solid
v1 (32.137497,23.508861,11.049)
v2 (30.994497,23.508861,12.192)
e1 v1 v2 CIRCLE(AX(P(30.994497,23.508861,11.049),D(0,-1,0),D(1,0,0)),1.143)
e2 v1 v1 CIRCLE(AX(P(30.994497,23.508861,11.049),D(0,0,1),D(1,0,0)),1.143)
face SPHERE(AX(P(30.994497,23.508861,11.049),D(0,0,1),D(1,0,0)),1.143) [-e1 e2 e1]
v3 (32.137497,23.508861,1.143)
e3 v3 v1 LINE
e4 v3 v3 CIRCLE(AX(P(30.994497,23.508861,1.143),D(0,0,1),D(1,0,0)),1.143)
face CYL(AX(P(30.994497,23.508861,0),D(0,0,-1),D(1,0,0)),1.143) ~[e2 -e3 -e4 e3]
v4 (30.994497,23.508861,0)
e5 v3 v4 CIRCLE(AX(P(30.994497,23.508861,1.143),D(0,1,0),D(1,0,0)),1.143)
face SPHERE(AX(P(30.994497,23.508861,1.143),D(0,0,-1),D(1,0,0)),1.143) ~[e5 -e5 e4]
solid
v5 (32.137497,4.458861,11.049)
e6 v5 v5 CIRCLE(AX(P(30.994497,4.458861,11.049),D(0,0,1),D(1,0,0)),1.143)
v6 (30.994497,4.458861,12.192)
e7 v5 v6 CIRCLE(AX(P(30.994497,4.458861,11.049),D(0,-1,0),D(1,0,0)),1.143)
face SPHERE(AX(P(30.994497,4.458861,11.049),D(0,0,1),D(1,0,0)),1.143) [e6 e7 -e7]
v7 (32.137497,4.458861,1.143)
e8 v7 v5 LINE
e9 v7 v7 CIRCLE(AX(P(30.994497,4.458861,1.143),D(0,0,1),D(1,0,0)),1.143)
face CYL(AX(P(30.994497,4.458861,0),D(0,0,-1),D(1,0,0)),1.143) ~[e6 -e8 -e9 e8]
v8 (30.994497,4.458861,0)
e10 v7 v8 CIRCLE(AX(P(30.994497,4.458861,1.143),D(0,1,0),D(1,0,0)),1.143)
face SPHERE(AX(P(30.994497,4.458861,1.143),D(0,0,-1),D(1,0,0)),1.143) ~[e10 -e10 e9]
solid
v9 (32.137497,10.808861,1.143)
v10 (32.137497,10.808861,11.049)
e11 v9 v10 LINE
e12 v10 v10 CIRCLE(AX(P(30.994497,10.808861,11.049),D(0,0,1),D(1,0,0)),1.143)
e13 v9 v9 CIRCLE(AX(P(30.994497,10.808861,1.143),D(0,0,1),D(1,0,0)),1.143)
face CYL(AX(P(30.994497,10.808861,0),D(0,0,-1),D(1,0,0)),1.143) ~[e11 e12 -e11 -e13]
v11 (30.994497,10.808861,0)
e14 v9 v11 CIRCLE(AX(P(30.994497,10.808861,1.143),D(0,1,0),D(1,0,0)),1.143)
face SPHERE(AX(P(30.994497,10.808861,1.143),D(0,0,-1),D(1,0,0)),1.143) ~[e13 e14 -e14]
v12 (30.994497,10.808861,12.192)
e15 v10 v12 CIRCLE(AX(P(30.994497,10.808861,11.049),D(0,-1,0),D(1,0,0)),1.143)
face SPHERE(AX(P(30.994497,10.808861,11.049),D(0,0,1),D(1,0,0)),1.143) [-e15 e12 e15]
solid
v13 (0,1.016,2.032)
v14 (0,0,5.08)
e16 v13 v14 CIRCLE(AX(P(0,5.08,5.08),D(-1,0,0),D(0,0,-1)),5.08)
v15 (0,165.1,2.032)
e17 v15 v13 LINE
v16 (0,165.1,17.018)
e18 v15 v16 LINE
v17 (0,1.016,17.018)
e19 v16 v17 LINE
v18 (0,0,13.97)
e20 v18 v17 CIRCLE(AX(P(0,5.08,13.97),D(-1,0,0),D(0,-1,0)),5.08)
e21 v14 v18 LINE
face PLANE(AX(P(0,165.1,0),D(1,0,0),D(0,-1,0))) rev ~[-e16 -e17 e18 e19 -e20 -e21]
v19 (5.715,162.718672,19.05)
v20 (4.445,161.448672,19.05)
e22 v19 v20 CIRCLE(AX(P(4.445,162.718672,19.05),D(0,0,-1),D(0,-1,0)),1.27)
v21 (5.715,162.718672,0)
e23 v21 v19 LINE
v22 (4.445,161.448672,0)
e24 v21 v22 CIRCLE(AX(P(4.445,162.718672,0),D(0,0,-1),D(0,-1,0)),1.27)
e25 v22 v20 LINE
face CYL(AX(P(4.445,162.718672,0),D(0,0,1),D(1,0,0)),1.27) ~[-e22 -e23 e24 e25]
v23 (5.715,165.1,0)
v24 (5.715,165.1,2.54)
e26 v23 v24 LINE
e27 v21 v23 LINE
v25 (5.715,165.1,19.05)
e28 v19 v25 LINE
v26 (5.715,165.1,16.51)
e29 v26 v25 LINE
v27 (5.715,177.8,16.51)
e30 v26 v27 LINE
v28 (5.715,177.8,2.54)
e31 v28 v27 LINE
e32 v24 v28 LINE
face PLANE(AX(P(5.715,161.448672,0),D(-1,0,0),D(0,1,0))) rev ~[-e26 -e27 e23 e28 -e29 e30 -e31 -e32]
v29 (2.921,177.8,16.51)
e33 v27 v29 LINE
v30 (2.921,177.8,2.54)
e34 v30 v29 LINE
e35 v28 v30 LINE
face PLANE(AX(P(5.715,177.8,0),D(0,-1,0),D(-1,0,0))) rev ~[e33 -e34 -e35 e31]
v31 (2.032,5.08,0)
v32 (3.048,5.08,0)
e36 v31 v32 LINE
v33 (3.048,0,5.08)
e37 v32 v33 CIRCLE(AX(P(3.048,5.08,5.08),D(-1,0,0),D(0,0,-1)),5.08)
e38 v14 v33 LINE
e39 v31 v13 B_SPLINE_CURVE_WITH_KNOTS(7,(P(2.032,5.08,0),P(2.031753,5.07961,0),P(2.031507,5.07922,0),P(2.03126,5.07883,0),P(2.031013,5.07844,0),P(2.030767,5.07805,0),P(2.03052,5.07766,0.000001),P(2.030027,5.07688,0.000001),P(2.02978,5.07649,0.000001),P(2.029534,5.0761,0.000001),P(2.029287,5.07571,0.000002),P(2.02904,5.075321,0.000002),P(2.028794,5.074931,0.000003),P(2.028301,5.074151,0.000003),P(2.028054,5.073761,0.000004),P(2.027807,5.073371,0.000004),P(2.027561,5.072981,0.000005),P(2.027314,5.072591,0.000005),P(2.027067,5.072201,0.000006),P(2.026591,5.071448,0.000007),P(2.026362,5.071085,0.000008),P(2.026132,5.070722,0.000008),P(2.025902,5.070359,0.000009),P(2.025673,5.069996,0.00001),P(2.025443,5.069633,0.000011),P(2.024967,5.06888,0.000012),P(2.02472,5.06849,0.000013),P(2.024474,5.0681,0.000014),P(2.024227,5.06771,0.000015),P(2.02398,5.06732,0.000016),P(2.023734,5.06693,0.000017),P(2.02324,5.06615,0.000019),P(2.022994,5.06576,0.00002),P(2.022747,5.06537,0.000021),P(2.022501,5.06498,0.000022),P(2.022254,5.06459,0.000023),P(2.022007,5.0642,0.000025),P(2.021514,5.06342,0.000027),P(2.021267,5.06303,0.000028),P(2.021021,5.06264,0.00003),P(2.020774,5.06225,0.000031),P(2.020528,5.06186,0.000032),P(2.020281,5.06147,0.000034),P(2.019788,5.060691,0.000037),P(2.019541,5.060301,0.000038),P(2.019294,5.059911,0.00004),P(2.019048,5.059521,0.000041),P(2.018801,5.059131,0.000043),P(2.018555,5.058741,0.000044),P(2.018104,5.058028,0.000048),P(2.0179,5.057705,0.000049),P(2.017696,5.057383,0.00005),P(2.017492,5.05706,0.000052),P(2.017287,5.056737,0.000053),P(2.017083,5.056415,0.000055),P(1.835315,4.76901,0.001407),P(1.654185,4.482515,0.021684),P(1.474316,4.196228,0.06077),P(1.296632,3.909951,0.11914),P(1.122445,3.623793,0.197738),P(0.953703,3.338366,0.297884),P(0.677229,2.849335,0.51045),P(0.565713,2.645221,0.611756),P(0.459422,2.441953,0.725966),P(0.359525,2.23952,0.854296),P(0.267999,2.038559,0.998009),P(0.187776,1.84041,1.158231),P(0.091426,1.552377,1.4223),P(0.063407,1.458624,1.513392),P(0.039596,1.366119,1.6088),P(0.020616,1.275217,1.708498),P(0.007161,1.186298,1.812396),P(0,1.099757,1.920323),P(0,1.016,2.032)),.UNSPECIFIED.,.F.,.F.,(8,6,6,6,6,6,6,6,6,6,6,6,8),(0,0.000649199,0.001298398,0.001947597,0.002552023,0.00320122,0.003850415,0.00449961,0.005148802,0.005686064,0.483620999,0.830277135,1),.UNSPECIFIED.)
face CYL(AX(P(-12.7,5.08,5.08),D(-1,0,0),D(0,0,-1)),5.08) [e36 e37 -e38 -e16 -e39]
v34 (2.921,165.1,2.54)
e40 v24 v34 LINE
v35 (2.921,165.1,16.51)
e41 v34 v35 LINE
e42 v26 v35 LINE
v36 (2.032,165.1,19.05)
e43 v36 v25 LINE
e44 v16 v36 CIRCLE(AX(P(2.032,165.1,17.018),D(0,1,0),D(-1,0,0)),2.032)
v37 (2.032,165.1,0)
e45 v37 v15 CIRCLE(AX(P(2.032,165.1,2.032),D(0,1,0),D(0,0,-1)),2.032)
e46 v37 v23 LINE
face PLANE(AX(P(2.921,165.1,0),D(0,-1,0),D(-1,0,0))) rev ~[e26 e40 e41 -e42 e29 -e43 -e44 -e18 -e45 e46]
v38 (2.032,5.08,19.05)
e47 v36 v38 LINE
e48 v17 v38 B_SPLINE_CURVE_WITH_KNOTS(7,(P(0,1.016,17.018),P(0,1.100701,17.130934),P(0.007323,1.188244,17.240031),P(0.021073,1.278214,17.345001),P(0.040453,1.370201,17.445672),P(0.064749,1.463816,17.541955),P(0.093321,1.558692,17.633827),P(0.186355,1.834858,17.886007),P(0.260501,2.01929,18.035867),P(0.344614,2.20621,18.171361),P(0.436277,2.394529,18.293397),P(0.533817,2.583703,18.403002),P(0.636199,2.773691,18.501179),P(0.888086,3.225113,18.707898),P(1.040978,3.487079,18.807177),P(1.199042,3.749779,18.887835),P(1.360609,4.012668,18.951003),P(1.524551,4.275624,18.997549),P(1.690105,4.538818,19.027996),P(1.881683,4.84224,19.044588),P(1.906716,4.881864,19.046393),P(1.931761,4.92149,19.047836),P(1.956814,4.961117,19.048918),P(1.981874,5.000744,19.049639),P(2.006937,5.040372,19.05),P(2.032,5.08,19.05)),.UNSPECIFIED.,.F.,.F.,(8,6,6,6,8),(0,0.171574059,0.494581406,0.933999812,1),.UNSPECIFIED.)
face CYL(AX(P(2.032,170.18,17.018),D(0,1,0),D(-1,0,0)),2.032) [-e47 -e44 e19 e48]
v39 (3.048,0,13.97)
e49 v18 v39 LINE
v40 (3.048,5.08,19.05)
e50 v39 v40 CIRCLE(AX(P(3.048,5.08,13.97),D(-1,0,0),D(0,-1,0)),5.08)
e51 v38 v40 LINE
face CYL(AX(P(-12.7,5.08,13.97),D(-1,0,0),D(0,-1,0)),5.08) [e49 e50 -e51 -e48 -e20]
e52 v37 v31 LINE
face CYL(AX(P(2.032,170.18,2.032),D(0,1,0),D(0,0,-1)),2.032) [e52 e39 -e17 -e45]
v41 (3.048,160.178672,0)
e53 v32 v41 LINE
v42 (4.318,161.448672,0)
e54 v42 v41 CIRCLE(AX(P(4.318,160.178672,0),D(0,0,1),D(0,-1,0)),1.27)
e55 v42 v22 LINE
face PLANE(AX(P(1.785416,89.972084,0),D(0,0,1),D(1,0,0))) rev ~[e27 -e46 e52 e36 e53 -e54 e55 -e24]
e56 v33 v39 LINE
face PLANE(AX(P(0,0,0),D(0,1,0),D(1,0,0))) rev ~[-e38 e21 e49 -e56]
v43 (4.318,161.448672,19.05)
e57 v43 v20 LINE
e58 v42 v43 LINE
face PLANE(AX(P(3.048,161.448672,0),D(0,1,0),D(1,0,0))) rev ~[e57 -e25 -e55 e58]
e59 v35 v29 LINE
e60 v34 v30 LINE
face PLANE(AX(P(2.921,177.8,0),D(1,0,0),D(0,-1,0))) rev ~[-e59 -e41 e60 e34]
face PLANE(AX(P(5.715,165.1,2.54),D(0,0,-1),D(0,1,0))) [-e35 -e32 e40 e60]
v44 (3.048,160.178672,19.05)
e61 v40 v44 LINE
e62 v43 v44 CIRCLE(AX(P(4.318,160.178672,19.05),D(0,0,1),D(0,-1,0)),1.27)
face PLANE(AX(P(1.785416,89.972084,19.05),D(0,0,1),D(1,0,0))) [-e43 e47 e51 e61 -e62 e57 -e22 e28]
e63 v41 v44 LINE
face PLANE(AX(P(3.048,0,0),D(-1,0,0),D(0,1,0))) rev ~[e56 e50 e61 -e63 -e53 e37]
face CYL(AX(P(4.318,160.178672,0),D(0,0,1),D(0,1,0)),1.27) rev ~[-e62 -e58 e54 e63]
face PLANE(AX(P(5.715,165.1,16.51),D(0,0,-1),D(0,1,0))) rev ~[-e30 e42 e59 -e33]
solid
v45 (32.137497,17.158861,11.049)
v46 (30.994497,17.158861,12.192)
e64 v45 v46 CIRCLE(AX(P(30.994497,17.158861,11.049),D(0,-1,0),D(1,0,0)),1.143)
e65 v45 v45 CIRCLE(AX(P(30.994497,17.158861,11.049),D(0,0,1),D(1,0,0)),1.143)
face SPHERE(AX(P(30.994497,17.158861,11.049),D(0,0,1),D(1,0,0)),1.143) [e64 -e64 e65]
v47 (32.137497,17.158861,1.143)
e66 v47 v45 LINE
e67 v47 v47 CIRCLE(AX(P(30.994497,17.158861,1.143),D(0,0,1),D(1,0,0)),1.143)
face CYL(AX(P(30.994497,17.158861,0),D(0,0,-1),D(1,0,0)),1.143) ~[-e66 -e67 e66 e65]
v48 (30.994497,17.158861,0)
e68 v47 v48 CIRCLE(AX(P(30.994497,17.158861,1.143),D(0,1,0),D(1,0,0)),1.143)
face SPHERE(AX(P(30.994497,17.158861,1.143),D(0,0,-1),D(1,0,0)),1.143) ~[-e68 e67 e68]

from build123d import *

# Parameters (mm, degrees)
F1_DEPTH    = 19.05
F2_T1_DEPTH = 28.448
F3_T1_DEPTH = 28.448
F4_R        = 1.27
F5_T1_DEPTH = 170.18
F6_W        = 12.7
F6_H        = 2.54
F7_DEPTH    = 25.4
F8_W        = 12.7
F8_H        = 2.54
F9_DEPTH    = 25.4
F10_R       = 1.143
F11_DEPTH   = 12.192
F12_R       = 1.143
F12_2_R     = 1.143
F12_3_R     = 1.143
F12_4_R     = 1.143


# Not quite as in the source:
# - a fillet or chamfer that OpenCascade refuses, or shapes differently, is made with other operations: its cross-section is extruded or revolved along the edge and cut away or added


with BuildPart() as f1:
    # F0 (on Top) → F1 (new body)
    with BuildSketch(Plane.XY):
        Polygon((0, 165.1), (0, 0), (3.048, 0), (3.048, 161.4486724138), (5.715, 161.4486724138), (5.715, 177.8), (2.921, 177.8), (2.921, 165.1), align=None)
    extrude(amount=F1_DEPTH)

    # F2: fillet of radius 5.08 on 1 edges, made by hand

    # F2_s2 → F2_t1 (cut)
    with BuildSketch(Plane.YZ.offset(-12.7)):
        with BuildLine():
            ThreePointArc((0, 13.97), (1.4878975516, 17.5621024484), (5.08, 19.05))
            Line((5.08, 19.05), (0, 19.05))
            Line((0, 19.05), (0, 13.97))
        make_face()
    extrude(amount=F2_T1_DEPTH, mode=Mode.SUBTRACT)

    # F3: fillet of radius 5.08 on 1 edges, made by hand

    # F3_s2 → F3_t1 (cut)
    with BuildSketch(Plane.YZ.offset(-12.7)):
        with BuildLine():
            ThreePointArc((5.08, 0), (1.4878975516, 1.4878975516), (0, 5.08))
            Line((0, 5.08), (0, 0))
            Line((0, 0), (5.08, 0))
        make_face()
    extrude(amount=F3_T1_DEPTH, mode=Mode.SUBTRACT)

    # F4
    f4_edges = [f1.edges().sort_by_distance(p)[0] for p in [
        (5.715, 161.448672, 9.525),
        (3.048, 161.448672, 9.525),
    ]]
    fillet(f4_edges, radius=F4_R)

    # F5: fillet of radius 2.032 on 2 edges, made by hand

    # F5_s2 → F5_t1 (cut)
    with BuildSketch(Plane.XZ.offset(-170.18)):
        with BuildLine():
            ThreePointArc((0, 17.018), (0.5951590206, 18.4548409794), (2.032, 19.05))
            Line((2.032, 19.05), (0, 19.05))
            Line((0, 19.05), (0, 17.018))
        make_face()
        with BuildLine():
            ThreePointArc((2.032, 0), (0.5951590206, 0.5951590206), (0, 2.032))
            Line((0, 2.032), (0, 0))
            Line((0, 0), (2.032, 0))
        make_face()
    extrude(amount=F5_T1_DEPTH, mode=Mode.SUBTRACT)

    # F6 (on face) → F7 (cut)
    with BuildSketch(Plane.YZ.offset(5.715)):
        with Locations((171.45, 17.78)):
            Rectangle(F6_W, F6_H)
    extrude(amount=-F7_DEPTH, mode=Mode.SUBTRACT)

    # F8 (on face) → F9 (cut)
    with BuildSketch(Plane.YZ.offset(5.715)):
        with Locations((171.45, 1.27)):
            Rectangle(F8_W, F8_H)
    extrude(amount=-F9_DEPTH, mode=Mode.SUBTRACT)


with BuildPart() as f11:
    # F10 (on Top) → F11 (new body)
    with BuildSketch(Plane.XY):
        with Locations((30.9944972396, 4.4588609599)):
            Circle(F10_R)
    extrude(amount=F11_DEPTH)

    # F12
    f12_edges = [f11.edges().sort_by_distance(p)[0] for p in [
        (29.851497, 4.458861, 12.192),
        (29.851497, 4.458861, 0),
    ]]
    fillet(f12_edges, radius=F12_R)


with BuildPart() as f11b:
    # F10 (on Top) → F11, piece 2 (new body)
    with BuildSketch(Plane.XY):
        with Locations((30.9944972396, 10.8088609599)):
            Circle(F10_R)
    extrude(amount=F11_DEPTH)

    # F12#2
    f12_2_edges = [f11b.edges().sort_by_distance(p)[0] for p in [
        (29.851497, 10.808861, 12.192),
        (29.851497, 10.808861, 0),
    ]]
    fillet(f12_2_edges, radius=F12_2_R)


with BuildPart() as f11c:
    # F10 (on Top) → F11, piece 3 (new body)
    with BuildSketch(Plane.XY):
        with Locations((30.9944972396, 17.1588609599)):
            Circle(F10_R)
    extrude(amount=F11_DEPTH)

    # F12#3
    f12_3_edges = [f11c.edges().sort_by_distance(p)[0] for p in [
        (29.851497, 17.158861, 12.192),
        (29.851497, 17.158861, 0),
    ]]
    fillet(f12_3_edges, radius=F12_3_R)


with BuildPart() as f11d:
    # F10 (on Top) → F11, piece 4 (new body)
    with BuildSketch(Plane.XY):
        with Locations((30.9944972396, 23.5088609599)):
            Circle(F10_R)
    extrude(amount=F11_DEPTH)

    # F12#4
    f12_4_edges = [f11d.edges().sort_by_distance(p)[0] for p in [
        (29.851497, 23.508861, 12.192),
        (29.851497, 23.508861, 0),
    ]]
    fillet(f12_4_edges, radius=F12_4_R)


solid = Compound([f1.part, f11.part, f11b.part, f11c.part, f11d.part])
